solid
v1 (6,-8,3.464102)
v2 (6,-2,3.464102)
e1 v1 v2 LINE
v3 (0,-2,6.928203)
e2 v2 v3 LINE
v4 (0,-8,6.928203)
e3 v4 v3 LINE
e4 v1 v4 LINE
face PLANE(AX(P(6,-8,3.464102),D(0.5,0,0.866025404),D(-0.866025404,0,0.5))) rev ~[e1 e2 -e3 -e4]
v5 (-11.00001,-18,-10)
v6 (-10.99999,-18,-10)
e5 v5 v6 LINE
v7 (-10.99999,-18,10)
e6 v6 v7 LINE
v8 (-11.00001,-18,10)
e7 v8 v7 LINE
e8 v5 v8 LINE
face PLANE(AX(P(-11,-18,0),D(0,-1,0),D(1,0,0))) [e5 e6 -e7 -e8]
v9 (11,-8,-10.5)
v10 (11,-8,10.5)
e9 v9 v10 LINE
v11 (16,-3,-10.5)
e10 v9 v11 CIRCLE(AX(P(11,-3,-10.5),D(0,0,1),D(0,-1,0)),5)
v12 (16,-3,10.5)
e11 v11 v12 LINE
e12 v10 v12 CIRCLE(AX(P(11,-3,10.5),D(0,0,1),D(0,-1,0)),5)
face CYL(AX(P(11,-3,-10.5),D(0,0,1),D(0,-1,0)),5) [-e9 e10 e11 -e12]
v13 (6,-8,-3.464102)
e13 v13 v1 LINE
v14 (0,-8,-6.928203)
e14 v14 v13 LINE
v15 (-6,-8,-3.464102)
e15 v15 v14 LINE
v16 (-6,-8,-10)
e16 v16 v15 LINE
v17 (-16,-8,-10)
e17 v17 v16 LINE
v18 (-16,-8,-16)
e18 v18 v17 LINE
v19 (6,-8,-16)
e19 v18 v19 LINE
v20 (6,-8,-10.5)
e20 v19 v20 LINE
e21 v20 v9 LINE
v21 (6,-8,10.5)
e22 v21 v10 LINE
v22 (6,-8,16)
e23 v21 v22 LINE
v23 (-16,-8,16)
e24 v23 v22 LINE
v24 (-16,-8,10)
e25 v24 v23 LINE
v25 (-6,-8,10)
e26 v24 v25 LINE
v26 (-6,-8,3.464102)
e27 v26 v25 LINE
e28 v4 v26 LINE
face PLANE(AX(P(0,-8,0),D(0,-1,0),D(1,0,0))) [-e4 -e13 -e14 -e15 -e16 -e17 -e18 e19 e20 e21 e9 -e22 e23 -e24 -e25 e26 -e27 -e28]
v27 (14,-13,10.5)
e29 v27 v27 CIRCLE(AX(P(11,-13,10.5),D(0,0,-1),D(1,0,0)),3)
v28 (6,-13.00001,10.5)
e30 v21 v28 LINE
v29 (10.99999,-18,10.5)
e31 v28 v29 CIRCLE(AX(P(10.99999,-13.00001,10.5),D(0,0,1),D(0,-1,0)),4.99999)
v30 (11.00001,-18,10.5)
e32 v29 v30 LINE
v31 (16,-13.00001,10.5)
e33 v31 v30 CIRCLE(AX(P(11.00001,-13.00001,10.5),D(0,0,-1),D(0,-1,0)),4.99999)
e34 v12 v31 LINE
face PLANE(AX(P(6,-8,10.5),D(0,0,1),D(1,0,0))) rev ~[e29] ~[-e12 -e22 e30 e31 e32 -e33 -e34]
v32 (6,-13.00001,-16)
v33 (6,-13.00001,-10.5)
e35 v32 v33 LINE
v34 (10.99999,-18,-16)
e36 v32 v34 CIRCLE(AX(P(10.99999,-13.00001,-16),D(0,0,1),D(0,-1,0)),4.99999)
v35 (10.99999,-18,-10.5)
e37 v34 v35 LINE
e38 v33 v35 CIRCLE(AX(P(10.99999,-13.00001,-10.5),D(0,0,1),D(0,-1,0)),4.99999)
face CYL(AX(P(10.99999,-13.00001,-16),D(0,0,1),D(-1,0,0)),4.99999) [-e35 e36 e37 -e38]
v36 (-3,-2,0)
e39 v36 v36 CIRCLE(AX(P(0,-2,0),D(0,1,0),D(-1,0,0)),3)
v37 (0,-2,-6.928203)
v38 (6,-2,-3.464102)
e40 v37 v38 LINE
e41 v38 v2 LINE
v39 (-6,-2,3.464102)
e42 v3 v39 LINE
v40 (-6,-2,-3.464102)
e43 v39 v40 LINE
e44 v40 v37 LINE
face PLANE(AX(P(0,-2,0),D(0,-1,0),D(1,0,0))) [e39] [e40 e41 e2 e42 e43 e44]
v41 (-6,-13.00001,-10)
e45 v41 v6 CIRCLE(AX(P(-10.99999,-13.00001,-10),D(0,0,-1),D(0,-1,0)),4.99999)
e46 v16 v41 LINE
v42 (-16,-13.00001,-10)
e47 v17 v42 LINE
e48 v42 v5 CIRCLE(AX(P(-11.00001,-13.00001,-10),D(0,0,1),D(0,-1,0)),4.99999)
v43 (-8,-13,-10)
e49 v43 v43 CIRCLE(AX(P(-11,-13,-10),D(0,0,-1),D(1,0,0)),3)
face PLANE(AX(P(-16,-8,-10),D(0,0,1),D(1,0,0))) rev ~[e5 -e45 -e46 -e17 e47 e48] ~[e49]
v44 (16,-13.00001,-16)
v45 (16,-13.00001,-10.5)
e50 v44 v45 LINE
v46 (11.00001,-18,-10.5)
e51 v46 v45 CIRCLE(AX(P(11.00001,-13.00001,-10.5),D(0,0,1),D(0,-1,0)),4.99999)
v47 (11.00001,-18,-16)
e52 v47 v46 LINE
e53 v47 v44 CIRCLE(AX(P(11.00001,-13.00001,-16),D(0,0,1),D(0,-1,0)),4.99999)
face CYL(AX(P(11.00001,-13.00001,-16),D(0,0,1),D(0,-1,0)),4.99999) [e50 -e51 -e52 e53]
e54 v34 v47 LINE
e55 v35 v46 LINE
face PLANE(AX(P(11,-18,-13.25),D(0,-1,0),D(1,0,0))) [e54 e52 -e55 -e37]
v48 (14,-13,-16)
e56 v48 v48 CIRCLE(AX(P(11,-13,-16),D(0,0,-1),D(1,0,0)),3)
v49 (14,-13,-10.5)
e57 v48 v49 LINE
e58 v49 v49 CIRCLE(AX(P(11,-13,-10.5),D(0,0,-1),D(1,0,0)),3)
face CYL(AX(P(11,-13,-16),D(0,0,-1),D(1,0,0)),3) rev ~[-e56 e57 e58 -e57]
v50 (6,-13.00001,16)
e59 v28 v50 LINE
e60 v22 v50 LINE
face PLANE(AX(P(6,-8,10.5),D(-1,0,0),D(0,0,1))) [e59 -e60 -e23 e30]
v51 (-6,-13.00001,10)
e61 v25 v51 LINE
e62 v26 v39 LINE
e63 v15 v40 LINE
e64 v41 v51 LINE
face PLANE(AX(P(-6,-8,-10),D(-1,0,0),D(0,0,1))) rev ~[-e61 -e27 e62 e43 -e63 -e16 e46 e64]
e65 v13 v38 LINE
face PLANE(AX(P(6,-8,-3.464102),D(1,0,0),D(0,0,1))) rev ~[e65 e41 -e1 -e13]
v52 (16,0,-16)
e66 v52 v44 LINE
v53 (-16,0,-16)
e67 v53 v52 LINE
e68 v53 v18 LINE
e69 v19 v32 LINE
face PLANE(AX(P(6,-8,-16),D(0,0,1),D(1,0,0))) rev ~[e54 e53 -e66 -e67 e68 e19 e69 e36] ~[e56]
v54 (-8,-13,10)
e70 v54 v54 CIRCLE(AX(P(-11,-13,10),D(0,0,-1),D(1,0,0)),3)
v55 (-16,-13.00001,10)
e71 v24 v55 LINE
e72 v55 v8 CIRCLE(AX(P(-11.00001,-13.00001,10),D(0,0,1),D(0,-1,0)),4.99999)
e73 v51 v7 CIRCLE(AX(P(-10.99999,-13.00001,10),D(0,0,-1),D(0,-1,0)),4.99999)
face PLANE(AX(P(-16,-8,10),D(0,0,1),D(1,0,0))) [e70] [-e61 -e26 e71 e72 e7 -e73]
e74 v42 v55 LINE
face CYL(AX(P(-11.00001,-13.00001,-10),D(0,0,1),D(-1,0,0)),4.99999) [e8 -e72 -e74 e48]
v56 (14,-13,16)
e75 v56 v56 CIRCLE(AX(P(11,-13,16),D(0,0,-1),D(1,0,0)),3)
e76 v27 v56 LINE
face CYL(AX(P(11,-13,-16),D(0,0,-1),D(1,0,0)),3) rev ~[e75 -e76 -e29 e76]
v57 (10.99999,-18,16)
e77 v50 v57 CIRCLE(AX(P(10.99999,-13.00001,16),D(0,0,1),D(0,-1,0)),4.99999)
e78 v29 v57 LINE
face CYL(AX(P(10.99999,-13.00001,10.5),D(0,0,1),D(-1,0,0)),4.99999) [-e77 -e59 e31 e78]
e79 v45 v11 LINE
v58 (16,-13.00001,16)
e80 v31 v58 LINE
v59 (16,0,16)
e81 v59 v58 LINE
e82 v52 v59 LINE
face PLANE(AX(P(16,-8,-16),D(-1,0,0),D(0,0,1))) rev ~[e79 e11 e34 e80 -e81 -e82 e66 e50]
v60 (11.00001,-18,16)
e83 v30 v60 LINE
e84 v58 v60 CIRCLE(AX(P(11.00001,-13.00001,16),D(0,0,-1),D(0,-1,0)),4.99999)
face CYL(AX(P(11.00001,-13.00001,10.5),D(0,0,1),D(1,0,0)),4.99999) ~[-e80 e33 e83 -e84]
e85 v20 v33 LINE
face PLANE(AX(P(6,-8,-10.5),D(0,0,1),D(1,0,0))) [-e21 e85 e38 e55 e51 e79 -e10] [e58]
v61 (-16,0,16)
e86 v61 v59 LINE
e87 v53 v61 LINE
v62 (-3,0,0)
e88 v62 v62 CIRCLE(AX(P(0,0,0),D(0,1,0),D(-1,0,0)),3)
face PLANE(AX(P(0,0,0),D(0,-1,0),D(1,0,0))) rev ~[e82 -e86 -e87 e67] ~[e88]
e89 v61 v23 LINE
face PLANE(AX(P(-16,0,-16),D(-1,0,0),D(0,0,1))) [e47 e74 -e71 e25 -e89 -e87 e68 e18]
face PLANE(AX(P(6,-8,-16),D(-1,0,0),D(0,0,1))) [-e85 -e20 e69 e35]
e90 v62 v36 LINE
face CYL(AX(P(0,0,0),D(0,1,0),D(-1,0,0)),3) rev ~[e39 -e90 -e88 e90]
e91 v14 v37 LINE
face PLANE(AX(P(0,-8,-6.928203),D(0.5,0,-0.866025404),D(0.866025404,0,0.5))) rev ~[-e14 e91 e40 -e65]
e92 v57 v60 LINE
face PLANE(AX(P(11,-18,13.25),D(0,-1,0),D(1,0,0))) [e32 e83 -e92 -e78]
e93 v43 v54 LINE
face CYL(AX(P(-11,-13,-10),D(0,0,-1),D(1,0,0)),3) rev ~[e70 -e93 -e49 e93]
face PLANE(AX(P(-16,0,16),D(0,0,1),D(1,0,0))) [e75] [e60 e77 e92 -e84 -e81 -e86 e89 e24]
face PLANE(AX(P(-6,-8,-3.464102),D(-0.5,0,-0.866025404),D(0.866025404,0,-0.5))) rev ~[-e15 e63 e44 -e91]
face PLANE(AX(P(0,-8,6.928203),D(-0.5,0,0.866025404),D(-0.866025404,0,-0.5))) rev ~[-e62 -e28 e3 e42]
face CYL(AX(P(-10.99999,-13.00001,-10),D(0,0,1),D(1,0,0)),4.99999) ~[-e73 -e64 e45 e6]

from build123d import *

# Parameters (mm, degrees)
F0_W      = 32
F0_H      = 32
F1_DEPTH  = 8
F2_W      = 10
F2_H      = 20
F2_H_2    = 5.5
F3_DEPTH  = 10
F5_DEPTH  = 6
F6_R      = 3
F7_DEPTH  = 25
F8_R      = 3
F9_DEPTH  = 25
F10_R     = 3
F11_DEPTH = 32.001
F12_R     = 4.99999
F13_R     = 4.99999
F14_R     = 5


# Not quite as in the source:
# - a fillet or chamfer is up to 0.001 mm smaller than in the source, because OpenCascade refuses the exact size


with BuildPart() as f1:
    # F0 (on Front) → F1 (new body)
    with BuildSketch(Plane.XZ):
        Rectangle(F0_W, F0_H)
    extrude(amount=F1_DEPTH)

    # F2 (on face) → F3 (join)
    with BuildSketch(Plane.XZ.offset(8)):
        with Locations((-11, 0)):
            Rectangle(F2_W, F2_H)
        with Locations((11, -13.25)):
            Rectangle(F2_W, F2_H_2)
        with Locations((11, 13.25)):
            Rectangle(F2_W, F2_H_2)
    extrude(amount=F3_DEPTH)

    # F4 (on face) → F5 (cut)
    with BuildSketch(Plane.XZ.offset(8)):
        Polygon((6, -3.4641016151), (6, 3.4641016151), (0, 6.9282032303), (-6, 3.4641016151), (-6, -3.4641016151), (0, -6.9282032303), align=None)
    extrude(amount=-F5_DEPTH, mode=Mode.SUBTRACT)

    # F6 (on face) → F7 (cut)
    with BuildSketch(Plane(origin=(0, 0, 0), x_dir=(-1, 0, 0), z_dir=(0, 1, 0))):
        Circle(F6_R)
    extrude(amount=-F7_DEPTH, mode=Mode.SUBTRACT)

    # F8 (on face) → F9 (cut)
    with BuildSketch(Plane(origin=(0, 0, -10), x_dir=(1, 0, 0), z_dir=(0, 0, -1))):
        with Locations((-11, 13)):
            Circle(F8_R)
    extrude(amount=-F9_DEPTH, mode=Mode.SUBTRACT)

    # F10 (on face) → F11 (cut, through all)
    with BuildSketch(Plane(origin=(0, 0, -16), x_dir=(1, 0, 0), z_dir=(0, 0, -1))):
        with Locations((11, 13)):
            Circle(F10_R)
    extrude(amount=-F11_DEPTH, mode=Mode.SUBTRACT)

    # F12 (radius 5 in the source; OpenCascade refuses exactly that, so slightly less here)
    f12_edges = [f1.edges().sort_by_distance(p)[0] for p in [
        (6, -18, 13.25),
        (16, -18, 13.25),
        (16, -18, -13.25),
        (6, -18, -13.25),
    ]]
    fillet(f12_edges, radius=F12_R)

    # F13 (radius 5 in the source; OpenCascade refuses exactly that, so slightly less here)
    f13_edges = [f1.edges().sort_by_distance(p)[0] for p in [
        (-6, -18, 0),
        (-16, -18, 0),
    ]]
    fillet(f13_edges, radius=F13_R)

    # F14
    f14_edges = [f1.edges().sort_by_distance(p)[0] for p in [
        (16, -8, 0),
    ]]
    fillet(f14_edges, radius=F14_R)


solid = f1.part
